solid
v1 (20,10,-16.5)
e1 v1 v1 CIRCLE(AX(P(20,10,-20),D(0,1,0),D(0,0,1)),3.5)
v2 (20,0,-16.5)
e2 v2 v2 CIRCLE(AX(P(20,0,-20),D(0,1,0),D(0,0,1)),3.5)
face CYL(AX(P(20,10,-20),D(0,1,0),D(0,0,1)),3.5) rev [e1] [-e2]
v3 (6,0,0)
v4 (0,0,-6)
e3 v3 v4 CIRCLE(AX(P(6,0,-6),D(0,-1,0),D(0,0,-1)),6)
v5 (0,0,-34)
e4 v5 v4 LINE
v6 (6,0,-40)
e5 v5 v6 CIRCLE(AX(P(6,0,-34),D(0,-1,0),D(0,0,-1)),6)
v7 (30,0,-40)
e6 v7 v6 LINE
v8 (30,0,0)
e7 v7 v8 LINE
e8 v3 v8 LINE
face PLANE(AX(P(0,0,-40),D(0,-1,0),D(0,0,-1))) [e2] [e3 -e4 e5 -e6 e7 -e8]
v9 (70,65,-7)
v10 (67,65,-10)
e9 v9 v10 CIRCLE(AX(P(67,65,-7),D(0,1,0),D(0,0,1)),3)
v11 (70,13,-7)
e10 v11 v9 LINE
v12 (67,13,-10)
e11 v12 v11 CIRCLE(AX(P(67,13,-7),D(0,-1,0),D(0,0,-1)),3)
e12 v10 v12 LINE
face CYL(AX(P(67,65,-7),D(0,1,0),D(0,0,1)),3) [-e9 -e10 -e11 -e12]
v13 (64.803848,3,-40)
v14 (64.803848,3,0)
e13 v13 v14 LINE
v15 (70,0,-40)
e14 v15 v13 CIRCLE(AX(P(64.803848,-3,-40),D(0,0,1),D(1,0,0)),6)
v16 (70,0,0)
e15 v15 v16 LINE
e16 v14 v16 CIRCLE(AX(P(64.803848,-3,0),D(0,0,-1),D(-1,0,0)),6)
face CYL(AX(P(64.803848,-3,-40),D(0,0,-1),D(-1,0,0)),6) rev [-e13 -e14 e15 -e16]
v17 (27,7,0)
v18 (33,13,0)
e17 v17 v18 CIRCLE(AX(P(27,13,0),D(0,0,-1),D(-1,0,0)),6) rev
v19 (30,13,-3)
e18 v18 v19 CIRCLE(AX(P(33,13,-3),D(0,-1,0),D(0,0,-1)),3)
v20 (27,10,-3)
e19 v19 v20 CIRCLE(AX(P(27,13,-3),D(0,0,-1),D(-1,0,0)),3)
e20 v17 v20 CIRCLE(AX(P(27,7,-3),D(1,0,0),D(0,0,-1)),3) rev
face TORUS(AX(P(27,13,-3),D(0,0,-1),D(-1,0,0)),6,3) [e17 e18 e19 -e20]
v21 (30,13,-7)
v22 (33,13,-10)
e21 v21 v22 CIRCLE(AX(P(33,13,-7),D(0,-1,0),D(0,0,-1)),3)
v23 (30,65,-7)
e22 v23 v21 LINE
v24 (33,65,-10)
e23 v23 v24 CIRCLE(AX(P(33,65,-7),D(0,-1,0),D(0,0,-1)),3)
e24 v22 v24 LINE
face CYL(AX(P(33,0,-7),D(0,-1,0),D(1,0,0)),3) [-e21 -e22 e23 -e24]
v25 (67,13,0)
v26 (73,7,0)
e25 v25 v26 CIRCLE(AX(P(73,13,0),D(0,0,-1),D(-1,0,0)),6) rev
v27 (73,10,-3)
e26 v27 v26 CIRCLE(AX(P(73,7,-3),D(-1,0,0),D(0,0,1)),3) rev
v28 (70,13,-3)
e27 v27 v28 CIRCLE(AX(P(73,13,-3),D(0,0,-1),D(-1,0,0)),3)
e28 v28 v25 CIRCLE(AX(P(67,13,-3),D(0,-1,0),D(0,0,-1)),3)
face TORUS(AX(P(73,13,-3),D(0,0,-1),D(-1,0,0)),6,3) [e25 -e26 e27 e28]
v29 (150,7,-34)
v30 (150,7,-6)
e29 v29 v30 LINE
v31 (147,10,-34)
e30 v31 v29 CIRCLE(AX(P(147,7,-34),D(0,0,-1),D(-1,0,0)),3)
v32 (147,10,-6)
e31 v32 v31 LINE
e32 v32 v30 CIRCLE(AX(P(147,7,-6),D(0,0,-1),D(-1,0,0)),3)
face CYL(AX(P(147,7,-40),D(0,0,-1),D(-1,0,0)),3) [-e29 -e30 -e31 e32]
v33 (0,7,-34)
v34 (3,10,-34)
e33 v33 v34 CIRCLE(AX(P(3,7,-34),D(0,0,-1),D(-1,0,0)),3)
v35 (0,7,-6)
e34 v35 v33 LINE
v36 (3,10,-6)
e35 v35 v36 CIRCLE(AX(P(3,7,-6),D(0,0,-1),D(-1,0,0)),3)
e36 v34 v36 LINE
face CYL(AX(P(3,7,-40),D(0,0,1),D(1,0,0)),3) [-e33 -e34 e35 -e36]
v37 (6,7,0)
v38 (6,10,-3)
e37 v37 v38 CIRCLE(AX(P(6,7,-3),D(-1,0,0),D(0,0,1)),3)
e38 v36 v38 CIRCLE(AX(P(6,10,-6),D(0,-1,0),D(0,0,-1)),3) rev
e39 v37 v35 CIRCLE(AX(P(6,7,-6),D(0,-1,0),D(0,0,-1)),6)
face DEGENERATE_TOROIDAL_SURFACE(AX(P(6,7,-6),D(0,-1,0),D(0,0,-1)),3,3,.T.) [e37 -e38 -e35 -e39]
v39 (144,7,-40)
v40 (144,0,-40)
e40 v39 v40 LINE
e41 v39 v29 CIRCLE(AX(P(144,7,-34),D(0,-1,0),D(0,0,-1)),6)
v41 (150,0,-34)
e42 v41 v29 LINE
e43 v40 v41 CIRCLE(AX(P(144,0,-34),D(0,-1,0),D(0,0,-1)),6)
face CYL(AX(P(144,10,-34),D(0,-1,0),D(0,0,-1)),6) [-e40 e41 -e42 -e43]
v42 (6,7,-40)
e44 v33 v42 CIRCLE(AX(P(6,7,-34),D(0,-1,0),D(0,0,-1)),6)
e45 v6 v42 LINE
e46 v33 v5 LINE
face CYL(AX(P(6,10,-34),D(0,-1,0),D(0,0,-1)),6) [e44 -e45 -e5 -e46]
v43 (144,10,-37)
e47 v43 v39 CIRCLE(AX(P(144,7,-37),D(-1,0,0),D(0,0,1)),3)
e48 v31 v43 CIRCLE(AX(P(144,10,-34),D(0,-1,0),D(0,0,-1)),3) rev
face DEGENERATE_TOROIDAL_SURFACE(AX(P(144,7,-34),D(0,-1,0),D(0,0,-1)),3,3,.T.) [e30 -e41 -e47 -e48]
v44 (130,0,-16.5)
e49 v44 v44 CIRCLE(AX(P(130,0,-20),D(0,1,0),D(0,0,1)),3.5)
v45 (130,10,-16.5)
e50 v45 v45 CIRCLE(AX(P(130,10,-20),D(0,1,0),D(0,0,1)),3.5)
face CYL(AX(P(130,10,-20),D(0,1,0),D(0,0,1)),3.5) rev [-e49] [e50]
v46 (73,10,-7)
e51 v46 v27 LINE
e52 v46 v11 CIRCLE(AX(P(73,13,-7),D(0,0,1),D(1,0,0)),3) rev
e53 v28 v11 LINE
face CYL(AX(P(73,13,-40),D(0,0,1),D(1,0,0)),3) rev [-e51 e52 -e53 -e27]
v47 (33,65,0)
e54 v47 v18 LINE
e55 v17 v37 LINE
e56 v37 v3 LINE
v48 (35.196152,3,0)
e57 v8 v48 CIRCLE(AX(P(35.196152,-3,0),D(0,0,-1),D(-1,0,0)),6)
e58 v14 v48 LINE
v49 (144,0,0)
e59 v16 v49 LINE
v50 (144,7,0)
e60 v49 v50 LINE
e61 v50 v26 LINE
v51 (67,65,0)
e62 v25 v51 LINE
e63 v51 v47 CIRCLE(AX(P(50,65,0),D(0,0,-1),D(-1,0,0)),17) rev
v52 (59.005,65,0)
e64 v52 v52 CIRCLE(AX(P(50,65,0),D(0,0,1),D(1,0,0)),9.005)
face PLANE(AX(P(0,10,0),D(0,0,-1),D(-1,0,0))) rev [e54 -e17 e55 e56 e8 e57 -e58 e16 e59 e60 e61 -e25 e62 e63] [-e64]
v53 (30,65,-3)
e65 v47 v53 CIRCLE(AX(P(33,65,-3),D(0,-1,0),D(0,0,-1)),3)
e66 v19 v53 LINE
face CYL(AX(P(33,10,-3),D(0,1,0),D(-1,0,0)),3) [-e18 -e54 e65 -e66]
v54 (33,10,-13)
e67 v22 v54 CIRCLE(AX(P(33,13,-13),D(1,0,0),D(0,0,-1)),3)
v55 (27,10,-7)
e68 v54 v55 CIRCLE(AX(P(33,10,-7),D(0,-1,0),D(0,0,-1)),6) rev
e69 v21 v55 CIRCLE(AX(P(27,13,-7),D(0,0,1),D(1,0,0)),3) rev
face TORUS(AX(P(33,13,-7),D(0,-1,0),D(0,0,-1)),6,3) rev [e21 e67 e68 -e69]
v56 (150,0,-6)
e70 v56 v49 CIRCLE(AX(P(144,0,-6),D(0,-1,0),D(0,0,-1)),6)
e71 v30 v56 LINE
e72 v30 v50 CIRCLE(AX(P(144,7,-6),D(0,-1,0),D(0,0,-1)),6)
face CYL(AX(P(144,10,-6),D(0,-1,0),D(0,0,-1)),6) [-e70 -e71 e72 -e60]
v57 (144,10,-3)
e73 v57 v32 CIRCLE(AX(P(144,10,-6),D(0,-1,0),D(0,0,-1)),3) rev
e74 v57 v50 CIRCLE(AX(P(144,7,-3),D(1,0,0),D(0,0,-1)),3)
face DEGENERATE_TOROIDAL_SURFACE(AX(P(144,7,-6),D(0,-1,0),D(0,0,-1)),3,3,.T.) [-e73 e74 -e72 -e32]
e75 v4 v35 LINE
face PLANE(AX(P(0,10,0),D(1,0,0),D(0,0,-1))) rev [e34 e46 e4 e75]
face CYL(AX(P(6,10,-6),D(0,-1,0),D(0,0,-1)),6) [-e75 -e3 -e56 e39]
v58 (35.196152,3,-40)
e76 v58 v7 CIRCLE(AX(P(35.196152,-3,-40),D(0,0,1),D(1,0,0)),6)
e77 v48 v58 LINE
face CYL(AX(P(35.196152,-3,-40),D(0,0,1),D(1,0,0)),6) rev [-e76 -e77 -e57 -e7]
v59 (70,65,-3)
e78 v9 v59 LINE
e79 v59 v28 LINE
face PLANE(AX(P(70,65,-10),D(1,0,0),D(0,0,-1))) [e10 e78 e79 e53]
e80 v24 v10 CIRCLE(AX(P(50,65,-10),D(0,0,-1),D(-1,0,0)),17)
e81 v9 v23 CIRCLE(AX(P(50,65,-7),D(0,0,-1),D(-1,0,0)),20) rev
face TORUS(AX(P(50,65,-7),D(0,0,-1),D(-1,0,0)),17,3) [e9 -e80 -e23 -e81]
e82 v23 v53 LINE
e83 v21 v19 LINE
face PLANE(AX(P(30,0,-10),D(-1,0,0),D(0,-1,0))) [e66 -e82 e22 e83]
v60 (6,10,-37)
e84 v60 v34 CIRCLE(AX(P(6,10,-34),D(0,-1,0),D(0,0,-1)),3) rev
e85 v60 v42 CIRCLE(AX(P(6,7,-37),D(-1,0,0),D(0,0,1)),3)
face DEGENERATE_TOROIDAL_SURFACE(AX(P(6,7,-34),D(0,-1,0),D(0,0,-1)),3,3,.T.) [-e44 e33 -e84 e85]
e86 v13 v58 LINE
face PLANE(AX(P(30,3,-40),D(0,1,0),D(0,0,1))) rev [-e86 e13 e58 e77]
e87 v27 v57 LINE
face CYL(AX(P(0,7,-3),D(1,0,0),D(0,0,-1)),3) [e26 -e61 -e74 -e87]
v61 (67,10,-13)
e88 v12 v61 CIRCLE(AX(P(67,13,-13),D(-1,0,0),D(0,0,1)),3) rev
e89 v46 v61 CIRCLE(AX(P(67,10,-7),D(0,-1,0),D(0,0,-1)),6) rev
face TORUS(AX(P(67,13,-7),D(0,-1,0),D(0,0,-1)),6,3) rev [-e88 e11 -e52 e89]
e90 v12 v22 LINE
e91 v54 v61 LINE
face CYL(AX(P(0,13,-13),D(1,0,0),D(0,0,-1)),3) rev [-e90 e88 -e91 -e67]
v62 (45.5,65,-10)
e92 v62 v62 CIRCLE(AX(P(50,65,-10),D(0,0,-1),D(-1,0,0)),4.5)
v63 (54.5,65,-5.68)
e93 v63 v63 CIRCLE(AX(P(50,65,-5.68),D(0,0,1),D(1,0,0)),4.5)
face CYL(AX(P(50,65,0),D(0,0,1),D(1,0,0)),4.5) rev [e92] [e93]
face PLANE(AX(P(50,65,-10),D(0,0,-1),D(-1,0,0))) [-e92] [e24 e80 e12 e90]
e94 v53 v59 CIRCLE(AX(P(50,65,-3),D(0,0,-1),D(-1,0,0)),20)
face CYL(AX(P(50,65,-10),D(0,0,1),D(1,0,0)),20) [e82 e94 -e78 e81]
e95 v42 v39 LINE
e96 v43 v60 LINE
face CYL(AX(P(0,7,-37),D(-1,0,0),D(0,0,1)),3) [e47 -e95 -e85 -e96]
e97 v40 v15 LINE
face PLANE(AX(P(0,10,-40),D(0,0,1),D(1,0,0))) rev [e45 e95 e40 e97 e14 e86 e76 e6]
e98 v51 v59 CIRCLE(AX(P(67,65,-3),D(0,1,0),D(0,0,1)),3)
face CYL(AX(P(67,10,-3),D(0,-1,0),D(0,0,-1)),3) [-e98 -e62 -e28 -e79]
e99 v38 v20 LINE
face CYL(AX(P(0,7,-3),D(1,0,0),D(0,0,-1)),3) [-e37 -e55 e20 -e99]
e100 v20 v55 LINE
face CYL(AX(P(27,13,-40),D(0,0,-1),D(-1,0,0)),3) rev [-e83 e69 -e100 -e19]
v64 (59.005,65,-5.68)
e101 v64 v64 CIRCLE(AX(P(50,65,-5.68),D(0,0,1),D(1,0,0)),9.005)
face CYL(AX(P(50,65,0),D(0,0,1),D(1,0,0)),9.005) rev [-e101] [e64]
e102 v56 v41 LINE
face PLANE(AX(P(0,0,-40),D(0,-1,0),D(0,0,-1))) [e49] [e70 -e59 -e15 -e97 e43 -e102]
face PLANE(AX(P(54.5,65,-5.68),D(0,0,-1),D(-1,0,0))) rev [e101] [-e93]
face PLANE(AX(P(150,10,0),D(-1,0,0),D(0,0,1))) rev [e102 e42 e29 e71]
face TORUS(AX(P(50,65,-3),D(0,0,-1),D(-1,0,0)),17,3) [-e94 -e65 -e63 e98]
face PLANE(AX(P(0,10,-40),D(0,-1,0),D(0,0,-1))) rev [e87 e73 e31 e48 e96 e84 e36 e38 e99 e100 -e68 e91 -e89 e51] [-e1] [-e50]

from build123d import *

# Parameters (mm, degrees)
SKETCH1_W                               = 150
SKETCH1_H                               = 40
BASE_PLATE_DEPTH                        = 10
VERT_BOSS_DEPTH                         = 10
SKETCH5_W                               = 40
SKETCH5_H                               = 3
SLOT_DEPTH                              = 177.988700204
F_7_0_7_DIAMETER_HOLE1_D                = 7
CBORE_FOR_M8_HEX_HEAD_BOLT1_D           = 9
CBORE_FOR_M8_HEX_HEAD_BOLT1_CBORE_D     = 18.01
CBORE_FOR_M8_HEX_HEAD_BOLT1_CBORE_DEPTH = 5.68
FILLET1_R                               = 6
FILLET2_R                               = 3


with BuildPart() as part:
    # Sketch1 → Base Plate (new body)
    with BuildSketch(Plane(origin=(0, 0, 0), x_dir=(1, 0, 0), z_dir=(0, 1, 0))):
        with Locations((75, 20)):
            Rectangle(SKETCH1_W, SKETCH1_H)
    extrude(amount=BASE_PLATE_DEPTH)

    # Sketch2 → Vert Boss (add)
    with BuildSketch(Plane.XY):
        with BuildLine():
            Line((30, 0), (30, 65))
            ThreePointArc((30, 65), (50, 85), (70, 65))
            Line((70, 65), (70, 0))
            Line((70, 0), (30, 0))
        make_face()
    extrude(amount=-VERT_BOSS_DEPTH)

    # Sketch5 → Slot (cut, through all)
    with BuildSketch(Plane.XY):
        with Locations((50, 1.5)):
            Rectangle(SKETCH5_W, SKETCH5_H)
    extrude(amount=-SLOT_DEPTH, mode=Mode.SUBTRACT)

    # Ø7.0 (7) Diameter Hole1 (through all)
    with Locations(Plane(origin=(0, 10, 0), x_dir=(-1, 0, 0), z_dir=(0, 1, 0))):
        with Locations((-130, -20), (-20, -20)):
            Hole(F_7_0_7_DIAMETER_HOLE1_D / 2)

    # CBORE for M8 Hex Head Bolt1 (through all)
    with Locations(Plane.XY):
        with Locations((50, 65)):
            CounterBoreHole(CBORE_FOR_M8_HEX_HEAD_BOLT1_D / 2, CBORE_FOR_M8_HEX_HEAD_BOLT1_CBORE_D / 2, CBORE_FOR_M8_HEX_HEAD_BOLT1_CBORE_DEPTH)

    # Fillet1
    # the kernel refuses this fillet: 6 mm, written as the material it adds along each edge
    with BuildSketch(Plane(origin=(70, 3, 0), x_dir=(-1, 0, 0), z_dir=(0, 0, -1))) as fillet1_piece_1:
        with BuildLine():
            CenterArc((5.196152423, -6), FILLET1_R, 90, 60)
            Line((0, -3), (0, 0))
            Line((0, 0), (5.196152423, 0))
        make_face()
    extrude(amount=40)
    with BuildSketch(Plane(origin=(30, 3, 0), x_dir=(0, -1, 0), z_dir=(0, 0, -1))) as fillet1_piece_2:
        with BuildLine():
            CenterArc((6, -5.196152423), FILLET1_R, 120, 60)
            Line((0, -5.196152423), (0, 0))
            Line((0, 0), (3, 0))
        make_face()
    extrude(amount=40)
    # the kernel refuses this fillet: 6 mm, written as the material it takes off along each edge
    with BuildSketch(Plane(origin=(0, -15, 0), x_dir=(1, 0, 0), z_dir=(0, 1, 0)), Plane(origin=(0, -15, -40), x_dir=(0, 0, 1), z_dir=(0, 1, 0))) as fillet1_2_piece_1:
        with BuildLine():
            CenterArc((FILLET1_R, FILLET1_R), FILLET1_R, 180, 90)
            Line((0, FILLET1_R), (0, 0))
            Line((0, 0), (FILLET1_R, 0))
        make_face()
    extrude(amount=40, mode=Mode.SUBTRACT)
    with BuildSketch(Plane(origin=(150, -15, -40), x_dir=(0, 0, 1), z_dir=(0, 1, 0)), Plane(origin=(150, -15, 0), x_dir=(-1, 0, 0), z_dir=(0, 1, 0))) as fillet1_2_piece_2:
        with BuildLine():
            CenterArc((FILLET1_R, -FILLET1_R), FILLET1_R, 90, 90)
            Line((0, -FILLET1_R), (0, 0))
            Line((0, 0), (FILLET1_R, 0))
        make_face()
    extrude(amount=40, mode=Mode.SUBTRACT)

    # Fillet2
    fillet2_edges = [part.edges().sort_by_distance(p)[0] for p in [
        (107, 10, 0),
        (30, 37.5, -10),
        (70, 37.5, -10),
        (30, 37.5, 0),
        (70, 37.5, 0),
        (50, 85, 0),
        (30, 10, -5),
        (50, 85, -10),
        (70, 10, -5),
        (50, 10, -10),
        (18, 10, 0),
        (0, 10, -20),
        (150, 10, -20),
        (75, 10, -40),
        (148.242640687, 10, -1.757359313),
        (148.242640687, 10, -38.242640687),
        (1.757359313, 10, -38.242640687),
        (1.757359313, 10, -1.757359313),
    ]]
    fillet(fillet2_edges, radius=FILLET2_R)


solid = part.part
